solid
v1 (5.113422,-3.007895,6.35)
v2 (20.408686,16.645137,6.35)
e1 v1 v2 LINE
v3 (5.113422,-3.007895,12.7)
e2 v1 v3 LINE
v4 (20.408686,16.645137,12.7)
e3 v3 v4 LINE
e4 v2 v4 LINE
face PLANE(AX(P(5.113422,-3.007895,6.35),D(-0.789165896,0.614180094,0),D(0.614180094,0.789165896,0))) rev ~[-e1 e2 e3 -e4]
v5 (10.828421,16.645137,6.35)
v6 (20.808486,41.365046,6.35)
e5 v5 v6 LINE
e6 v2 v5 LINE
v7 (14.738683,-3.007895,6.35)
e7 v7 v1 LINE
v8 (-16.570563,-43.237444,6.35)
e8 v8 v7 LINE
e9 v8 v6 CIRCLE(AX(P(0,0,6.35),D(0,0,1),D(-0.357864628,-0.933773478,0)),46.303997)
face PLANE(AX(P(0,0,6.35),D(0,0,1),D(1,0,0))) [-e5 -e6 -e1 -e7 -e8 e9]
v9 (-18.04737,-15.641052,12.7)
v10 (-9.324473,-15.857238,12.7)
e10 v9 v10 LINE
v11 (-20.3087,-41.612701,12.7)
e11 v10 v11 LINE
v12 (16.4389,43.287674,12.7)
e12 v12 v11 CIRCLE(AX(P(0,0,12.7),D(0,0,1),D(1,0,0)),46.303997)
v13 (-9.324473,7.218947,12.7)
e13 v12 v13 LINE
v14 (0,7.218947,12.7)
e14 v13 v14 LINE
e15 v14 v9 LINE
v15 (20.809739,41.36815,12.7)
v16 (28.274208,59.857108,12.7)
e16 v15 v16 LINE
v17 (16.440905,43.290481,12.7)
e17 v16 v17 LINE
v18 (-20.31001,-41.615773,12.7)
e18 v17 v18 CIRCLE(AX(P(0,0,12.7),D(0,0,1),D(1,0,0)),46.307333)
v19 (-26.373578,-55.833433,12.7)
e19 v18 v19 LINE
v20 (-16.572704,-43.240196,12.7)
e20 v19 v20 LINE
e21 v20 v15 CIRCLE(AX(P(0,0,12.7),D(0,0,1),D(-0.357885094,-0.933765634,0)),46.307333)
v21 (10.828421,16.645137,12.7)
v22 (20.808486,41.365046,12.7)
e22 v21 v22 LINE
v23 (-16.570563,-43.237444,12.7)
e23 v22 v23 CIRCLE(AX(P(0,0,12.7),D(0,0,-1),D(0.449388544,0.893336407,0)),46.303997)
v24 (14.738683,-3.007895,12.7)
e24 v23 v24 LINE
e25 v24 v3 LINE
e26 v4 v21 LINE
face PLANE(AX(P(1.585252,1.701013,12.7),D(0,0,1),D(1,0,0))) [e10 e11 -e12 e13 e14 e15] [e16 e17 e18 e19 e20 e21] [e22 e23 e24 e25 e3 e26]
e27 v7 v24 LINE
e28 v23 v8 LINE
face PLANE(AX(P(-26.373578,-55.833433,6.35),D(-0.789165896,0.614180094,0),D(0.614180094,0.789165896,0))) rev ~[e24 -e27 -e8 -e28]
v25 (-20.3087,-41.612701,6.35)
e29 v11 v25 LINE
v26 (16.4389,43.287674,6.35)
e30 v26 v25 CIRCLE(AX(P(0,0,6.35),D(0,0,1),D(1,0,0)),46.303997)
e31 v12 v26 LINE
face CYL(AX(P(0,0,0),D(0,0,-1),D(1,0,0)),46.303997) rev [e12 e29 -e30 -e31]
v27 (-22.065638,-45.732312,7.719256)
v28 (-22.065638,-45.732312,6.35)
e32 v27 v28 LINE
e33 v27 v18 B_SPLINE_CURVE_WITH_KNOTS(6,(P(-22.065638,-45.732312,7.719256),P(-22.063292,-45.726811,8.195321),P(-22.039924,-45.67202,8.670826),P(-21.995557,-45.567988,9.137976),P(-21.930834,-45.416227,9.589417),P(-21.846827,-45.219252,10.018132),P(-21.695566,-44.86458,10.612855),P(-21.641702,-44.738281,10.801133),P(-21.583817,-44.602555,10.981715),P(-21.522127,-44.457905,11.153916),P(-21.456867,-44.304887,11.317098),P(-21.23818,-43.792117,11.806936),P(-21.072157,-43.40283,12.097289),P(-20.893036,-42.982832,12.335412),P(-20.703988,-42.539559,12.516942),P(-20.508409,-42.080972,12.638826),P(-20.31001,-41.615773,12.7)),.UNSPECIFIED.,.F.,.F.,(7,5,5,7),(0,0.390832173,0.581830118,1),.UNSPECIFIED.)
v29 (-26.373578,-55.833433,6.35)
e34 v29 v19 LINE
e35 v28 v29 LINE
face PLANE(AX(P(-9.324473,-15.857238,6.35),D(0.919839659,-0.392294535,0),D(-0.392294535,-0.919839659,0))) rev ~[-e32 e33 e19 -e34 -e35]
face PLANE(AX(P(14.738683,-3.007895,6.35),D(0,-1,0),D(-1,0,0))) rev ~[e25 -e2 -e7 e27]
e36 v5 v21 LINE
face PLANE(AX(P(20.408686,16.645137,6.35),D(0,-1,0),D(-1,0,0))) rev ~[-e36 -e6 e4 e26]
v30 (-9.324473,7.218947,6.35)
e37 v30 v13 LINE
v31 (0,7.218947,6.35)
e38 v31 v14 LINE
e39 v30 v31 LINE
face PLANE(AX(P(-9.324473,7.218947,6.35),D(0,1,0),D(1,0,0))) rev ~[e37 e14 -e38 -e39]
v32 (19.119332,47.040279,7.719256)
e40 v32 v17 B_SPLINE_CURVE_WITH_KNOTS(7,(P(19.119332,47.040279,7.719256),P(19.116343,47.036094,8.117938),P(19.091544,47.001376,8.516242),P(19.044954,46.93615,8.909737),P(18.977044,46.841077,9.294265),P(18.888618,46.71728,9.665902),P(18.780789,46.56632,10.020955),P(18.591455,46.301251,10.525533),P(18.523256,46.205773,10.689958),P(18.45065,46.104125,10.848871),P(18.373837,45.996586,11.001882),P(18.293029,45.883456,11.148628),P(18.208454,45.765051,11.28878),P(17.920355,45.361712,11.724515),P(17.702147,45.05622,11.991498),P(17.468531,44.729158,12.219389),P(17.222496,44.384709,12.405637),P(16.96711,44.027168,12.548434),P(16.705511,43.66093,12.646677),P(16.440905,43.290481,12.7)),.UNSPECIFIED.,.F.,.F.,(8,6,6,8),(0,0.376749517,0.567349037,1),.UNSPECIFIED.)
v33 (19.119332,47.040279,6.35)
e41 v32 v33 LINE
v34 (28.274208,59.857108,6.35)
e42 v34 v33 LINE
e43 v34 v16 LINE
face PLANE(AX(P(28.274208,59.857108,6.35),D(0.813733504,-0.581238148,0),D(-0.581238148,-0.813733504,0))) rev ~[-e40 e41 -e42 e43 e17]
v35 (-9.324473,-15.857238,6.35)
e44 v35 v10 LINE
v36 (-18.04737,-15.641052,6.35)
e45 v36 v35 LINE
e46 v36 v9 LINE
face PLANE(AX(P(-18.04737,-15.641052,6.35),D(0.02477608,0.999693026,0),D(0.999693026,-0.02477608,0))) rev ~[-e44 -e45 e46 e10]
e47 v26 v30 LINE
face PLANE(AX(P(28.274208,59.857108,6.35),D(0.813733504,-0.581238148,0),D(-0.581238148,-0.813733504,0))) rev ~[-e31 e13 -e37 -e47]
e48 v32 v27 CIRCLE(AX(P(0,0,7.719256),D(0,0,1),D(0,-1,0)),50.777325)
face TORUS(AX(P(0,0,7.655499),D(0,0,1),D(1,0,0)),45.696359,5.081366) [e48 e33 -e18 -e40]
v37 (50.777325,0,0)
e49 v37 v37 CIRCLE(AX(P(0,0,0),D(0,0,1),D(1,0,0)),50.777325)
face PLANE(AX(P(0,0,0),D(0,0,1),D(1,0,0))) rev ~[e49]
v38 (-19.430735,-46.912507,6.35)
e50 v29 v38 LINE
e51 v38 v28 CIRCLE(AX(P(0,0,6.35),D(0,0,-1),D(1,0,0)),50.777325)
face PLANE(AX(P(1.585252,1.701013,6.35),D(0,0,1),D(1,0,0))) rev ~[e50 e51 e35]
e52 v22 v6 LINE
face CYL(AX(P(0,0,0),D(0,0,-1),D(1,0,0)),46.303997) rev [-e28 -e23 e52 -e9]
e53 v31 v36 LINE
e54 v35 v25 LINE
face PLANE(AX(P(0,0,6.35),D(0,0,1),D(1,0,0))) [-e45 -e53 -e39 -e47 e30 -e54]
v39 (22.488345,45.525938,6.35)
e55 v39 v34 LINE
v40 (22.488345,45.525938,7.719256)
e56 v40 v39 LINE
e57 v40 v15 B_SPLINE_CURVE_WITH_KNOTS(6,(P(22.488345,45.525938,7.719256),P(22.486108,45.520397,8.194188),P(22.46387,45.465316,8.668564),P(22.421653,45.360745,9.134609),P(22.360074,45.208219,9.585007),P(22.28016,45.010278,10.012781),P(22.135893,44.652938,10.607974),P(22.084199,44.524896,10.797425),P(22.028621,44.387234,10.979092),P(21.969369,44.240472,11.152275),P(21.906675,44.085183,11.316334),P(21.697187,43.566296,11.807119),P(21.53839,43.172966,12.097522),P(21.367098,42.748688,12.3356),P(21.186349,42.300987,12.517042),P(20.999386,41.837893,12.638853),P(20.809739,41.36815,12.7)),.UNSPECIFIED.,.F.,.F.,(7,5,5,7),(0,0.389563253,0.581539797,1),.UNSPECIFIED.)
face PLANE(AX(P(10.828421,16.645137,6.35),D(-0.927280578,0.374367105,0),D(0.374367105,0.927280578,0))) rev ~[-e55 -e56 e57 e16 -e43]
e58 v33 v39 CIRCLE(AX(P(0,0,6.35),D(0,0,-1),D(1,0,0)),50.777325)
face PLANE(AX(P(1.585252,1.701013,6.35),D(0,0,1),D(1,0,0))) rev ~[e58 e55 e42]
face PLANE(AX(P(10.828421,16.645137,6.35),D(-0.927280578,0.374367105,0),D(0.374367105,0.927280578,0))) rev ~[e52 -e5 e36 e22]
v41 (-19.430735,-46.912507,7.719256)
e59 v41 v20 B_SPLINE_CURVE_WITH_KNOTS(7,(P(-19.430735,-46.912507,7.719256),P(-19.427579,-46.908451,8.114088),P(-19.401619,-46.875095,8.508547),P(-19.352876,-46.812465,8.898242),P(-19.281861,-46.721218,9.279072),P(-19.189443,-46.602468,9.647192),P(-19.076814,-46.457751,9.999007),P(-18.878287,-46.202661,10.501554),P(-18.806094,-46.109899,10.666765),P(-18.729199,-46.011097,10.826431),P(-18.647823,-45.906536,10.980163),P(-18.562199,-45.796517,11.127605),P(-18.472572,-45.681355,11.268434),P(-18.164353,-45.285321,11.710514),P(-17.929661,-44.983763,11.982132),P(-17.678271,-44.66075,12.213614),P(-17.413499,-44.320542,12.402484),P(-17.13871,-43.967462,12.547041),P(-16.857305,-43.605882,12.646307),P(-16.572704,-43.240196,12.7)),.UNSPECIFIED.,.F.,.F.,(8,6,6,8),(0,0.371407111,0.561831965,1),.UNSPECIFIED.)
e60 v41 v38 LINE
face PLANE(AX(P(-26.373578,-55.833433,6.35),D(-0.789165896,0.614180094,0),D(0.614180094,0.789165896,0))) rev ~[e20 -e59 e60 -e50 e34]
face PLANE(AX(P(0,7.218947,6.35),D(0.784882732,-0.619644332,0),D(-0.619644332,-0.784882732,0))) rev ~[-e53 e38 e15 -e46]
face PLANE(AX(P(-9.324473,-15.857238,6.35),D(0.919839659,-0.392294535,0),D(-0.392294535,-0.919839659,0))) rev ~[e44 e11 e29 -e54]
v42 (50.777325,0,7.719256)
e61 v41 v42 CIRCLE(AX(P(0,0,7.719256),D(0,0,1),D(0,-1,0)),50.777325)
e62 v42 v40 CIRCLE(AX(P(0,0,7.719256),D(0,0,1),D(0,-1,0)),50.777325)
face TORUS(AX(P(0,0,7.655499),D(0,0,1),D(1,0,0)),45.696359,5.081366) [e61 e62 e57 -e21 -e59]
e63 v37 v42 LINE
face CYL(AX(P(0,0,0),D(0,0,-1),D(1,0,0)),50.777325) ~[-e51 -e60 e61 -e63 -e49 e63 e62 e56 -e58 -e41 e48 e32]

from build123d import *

# Parameters (mm, degrees)
F0_R     = 46.303997109
F1_DEPTH = 6.35
F0_R_2   = 50.7773250867
F2_DEPTH = 12.7
F5_DEPTH = 6.35


# Not quite as in the source:
# - a fillet or chamfer that OpenCascade refuses, or shapes differently, is made with other operations: its cross-section is extruded or revolved along the edge and cut away or added


with BuildPart() as f1:
    # F0 (on Top) → F1 (new body)
    with BuildSketch(Plane.XY):
        Circle(F0_R)
    extrude(amount=F1_DEPTH)

    # F0 (on Top) → F2 (join)
    with BuildSketch(Plane.XY):
        Circle(F0_R_2)
        Circle(F0_R, mode=Mode.SUBTRACT)
    extrude(amount=F2_DEPTH)

    # F3: fillet of radius 5.08 on 1 edges, made by hand

    # F3_s1 → F3_t2 (revolve, cut)
    with BuildSketch(Plane.XZ):
        with BuildLine():
            ThreePointArc((50.7777250867, 7.6554991612), (49.4982109042, 11.0268790536), (46.3040449454, 12.7003971293))
            Line((46.3040449454, 12.7003971293), (46.3648134998, 13.2048869261))
            ThreePointArc((46.3648134998, 13.2048869261), (48.540685016, 13.2081365685), (50.7773250867, 13.2081365685))
            Line((50.7773250867, 13.2081365685), (51.2854616553, 12.7))
            ThreePointArc((51.2854616553, 12.7), (51.2854616553, 10.1777495806), (51.2858616553, 7.6554991612))
            Line((51.2858616553, 7.6554991612), (50.7777250867, 7.6554991612))
        make_face()
    revolve(axis=Axis((0, 0, 12.7), (0, 0, 1)), mode=Mode.SUBTRACT)

    # F4 (on face) → F5 (join)
    with BuildSketch(Plane.XY.offset(6.35)):
        Polygon((-9.3244733289, -15.8572378275), (-26.3735784938, -55.8334334653), (14.7386826575, -3.0078946147), (5.1134219393, -3.0078946147), (20.4086864271, 16.6451374931), (10.8284205198, 16.6451374931), (28.2742083073, 59.8571076989), (-9.3244733289, 7.2189471684), (0, 7.2189471684), (-18.0473700166, -15.6410522759), align=None)
    extrude(amount=F5_DEPTH)


solid = f1.part
